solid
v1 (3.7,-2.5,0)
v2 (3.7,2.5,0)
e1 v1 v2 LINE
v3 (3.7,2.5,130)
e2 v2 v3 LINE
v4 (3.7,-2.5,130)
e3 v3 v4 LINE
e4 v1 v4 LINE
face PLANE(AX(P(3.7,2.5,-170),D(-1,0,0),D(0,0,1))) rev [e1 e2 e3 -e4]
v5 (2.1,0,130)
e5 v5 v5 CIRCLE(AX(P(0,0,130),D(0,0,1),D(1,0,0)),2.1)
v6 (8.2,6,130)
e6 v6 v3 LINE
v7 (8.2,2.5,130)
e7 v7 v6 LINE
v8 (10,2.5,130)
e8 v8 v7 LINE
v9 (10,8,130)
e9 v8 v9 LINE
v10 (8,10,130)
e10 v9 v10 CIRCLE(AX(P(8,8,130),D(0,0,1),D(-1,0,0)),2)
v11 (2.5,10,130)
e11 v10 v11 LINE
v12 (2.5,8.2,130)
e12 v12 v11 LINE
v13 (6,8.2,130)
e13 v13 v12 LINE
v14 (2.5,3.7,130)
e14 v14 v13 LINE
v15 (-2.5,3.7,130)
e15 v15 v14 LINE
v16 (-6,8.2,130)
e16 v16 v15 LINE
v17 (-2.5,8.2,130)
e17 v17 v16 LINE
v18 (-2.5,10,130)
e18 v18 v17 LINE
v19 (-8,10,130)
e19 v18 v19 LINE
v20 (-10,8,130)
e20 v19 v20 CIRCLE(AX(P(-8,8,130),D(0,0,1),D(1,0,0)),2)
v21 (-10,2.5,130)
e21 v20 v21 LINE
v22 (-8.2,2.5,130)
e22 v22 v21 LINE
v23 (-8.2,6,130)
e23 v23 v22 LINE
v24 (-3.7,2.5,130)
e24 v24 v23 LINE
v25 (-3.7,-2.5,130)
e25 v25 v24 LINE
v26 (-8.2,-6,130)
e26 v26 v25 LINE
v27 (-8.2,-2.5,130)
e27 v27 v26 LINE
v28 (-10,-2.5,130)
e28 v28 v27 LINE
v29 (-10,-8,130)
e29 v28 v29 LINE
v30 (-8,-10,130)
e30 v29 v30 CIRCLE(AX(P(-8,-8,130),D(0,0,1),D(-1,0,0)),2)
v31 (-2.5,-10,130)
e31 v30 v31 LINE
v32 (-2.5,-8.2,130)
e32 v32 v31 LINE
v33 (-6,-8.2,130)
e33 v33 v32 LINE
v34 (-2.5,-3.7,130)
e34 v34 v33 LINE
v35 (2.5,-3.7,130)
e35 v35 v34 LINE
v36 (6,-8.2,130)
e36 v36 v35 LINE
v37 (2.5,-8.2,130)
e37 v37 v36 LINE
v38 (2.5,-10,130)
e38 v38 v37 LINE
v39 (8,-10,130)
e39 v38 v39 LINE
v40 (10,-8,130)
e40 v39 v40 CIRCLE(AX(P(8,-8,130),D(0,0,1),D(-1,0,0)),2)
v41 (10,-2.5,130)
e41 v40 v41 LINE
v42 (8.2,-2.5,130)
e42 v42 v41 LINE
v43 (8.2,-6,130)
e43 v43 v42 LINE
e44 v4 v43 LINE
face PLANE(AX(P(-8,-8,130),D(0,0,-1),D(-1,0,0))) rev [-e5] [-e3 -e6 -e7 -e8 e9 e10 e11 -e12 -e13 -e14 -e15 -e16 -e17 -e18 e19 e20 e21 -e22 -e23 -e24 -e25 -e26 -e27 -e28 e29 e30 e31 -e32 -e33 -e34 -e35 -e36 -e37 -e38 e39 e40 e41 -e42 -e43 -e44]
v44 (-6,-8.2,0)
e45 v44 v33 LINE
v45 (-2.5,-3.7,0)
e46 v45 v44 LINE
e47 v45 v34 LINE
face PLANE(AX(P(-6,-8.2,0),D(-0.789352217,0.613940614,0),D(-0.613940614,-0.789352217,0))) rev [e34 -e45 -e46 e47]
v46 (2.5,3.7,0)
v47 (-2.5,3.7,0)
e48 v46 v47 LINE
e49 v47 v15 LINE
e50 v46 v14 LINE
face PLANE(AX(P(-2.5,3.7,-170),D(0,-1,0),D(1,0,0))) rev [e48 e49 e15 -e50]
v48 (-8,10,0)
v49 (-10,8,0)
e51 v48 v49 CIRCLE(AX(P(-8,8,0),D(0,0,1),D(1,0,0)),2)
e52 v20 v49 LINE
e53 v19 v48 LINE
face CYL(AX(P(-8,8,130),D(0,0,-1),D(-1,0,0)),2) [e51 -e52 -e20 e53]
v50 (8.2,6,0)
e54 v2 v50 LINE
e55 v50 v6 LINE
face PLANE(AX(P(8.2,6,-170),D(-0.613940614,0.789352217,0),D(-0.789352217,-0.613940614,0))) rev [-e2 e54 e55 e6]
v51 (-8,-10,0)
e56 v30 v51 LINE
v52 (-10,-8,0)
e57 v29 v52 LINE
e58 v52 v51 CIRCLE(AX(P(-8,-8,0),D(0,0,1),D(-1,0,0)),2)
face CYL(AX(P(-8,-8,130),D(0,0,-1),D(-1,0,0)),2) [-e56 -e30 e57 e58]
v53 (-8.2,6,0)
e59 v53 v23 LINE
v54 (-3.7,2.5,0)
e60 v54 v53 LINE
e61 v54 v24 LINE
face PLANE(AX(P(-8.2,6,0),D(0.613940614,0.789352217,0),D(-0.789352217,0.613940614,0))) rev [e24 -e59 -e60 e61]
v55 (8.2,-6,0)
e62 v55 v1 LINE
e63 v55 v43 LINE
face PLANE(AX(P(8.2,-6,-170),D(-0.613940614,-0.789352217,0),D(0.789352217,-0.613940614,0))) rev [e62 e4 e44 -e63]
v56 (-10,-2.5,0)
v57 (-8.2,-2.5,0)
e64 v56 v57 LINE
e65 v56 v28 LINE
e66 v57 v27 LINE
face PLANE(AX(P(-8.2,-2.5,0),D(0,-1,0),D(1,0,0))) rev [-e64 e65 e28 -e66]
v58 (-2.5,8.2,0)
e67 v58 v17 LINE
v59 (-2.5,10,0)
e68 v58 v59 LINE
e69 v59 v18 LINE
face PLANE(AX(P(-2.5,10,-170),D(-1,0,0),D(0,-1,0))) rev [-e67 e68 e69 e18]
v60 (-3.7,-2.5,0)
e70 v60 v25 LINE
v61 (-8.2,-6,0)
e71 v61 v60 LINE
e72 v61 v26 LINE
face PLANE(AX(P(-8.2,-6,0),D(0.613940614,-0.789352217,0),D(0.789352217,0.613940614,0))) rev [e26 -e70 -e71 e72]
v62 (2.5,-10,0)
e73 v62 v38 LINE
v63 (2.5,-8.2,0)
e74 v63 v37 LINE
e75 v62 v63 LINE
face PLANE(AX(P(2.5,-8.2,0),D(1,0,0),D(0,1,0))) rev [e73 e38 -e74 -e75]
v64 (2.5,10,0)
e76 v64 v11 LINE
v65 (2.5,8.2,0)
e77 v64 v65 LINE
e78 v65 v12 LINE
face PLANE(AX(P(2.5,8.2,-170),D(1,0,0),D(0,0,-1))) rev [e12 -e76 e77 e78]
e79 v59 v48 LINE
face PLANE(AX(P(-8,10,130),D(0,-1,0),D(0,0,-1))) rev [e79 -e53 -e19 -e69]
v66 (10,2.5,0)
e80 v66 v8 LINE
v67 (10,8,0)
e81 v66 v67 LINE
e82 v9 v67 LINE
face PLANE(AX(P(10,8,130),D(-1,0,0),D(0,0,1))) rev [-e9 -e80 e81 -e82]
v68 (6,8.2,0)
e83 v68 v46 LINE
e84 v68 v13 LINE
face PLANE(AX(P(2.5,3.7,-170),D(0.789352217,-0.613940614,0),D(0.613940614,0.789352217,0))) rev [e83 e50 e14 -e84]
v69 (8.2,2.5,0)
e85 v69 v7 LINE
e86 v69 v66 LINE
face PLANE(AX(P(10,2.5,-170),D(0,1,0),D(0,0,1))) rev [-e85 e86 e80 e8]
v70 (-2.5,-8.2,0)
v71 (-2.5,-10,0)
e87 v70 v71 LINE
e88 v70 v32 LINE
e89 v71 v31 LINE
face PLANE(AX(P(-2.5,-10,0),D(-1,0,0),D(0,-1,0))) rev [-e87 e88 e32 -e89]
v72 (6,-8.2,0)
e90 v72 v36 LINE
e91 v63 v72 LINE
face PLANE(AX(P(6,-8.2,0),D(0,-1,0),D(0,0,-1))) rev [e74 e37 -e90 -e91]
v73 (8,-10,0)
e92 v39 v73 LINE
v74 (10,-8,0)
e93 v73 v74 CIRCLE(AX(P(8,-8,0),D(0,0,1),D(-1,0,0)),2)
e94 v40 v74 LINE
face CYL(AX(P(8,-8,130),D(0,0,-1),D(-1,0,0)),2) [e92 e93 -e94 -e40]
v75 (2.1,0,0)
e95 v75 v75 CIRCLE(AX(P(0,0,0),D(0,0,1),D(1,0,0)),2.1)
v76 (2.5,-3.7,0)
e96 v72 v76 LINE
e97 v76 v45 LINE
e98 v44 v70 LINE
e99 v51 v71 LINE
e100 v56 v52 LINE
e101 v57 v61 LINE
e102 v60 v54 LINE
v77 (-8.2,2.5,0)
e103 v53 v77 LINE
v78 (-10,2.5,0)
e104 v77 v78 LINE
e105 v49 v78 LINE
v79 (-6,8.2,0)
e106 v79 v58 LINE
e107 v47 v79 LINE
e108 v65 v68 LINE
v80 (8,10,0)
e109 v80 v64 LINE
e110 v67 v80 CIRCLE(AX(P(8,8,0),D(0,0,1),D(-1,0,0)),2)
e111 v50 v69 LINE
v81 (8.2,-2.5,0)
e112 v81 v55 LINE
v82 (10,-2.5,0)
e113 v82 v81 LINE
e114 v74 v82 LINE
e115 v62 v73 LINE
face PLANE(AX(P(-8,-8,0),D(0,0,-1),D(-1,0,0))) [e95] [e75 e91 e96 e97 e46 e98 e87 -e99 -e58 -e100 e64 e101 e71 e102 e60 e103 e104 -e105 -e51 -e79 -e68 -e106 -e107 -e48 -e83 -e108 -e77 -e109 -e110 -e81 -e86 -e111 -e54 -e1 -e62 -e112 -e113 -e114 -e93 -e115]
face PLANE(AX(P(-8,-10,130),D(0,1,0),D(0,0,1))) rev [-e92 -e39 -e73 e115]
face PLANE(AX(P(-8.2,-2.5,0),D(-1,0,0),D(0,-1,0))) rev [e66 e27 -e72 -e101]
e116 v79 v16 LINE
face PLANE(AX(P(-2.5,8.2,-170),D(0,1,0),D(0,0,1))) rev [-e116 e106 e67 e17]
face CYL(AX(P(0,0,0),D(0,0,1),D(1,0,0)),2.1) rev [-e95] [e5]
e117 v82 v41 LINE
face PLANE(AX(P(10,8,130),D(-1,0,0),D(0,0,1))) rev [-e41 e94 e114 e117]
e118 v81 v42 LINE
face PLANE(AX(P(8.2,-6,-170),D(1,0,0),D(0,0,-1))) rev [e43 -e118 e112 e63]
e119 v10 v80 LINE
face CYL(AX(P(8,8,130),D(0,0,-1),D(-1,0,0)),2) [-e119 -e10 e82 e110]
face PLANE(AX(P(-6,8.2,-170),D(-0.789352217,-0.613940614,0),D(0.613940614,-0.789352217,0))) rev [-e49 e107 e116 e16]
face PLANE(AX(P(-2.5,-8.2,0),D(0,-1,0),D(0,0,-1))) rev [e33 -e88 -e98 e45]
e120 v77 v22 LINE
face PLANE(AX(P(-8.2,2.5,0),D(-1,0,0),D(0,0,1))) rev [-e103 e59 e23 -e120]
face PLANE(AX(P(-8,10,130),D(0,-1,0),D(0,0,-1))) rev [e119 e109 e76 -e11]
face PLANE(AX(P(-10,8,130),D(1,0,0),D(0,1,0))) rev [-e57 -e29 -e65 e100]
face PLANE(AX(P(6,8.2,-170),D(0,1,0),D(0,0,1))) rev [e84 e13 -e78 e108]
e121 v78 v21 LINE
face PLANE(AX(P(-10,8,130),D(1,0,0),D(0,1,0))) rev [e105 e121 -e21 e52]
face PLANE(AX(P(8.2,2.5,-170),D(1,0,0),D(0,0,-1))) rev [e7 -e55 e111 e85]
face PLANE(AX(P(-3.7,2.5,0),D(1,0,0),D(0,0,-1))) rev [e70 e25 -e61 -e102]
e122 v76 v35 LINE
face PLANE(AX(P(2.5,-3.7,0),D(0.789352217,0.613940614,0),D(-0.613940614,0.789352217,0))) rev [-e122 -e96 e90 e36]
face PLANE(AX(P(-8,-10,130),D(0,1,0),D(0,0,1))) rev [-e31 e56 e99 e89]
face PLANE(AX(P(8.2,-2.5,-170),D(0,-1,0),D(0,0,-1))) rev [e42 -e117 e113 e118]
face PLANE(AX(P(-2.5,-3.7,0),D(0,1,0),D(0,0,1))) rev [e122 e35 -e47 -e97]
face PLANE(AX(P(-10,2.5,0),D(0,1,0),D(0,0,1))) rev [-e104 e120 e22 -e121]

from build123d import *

# Parameters (mm, degrees)
EXTRUSION1_DEPTH        = 130
PER_AGE1_OUTLINE_R      = 2.1
PER_AGE1_DEPTH          = 130
ENL_V_MAT_EXTRU_1_DEPTH = 300
ENL_V_MAT_EXTRU_3_DEPTH = 300
ENL_V_MAT_EXTRU_4_DEPTH = 131.766968306
ENL_V_MAT_EXTRU_7_DEPTH = 131.766968306


# Read off the part's stored shape, not the designer's step: Perçage1
with BuildPart() as part:
    # Esquisse1 → Extrusion1 (new body)
    with BuildSketch(Plane.XY):
        with BuildLine():
            Line((-10, 8), (-10, -8))
            ThreePointArc((-10, -8), (-9.414213562, -9.414213562), (-8, -10))
            Line((-8, -10), (8, -10))
            ThreePointArc((8, -10), (9.414213562, -9.414213562), (10, -8))
            Line((10, -8), (10, 8))
            ThreePointArc((10, 8), (9.414213562, 9.414213562), (8, 10))
            Line((8, 10), (-8, 10))
            ThreePointArc((-8, 10), (-9.414213562, 9.414213562), (-10, 8))
        make_face()
    extrude(amount=EXTRUSION1_DEPTH)

    # Perçage1 outline → Perçage1 (cut)
    with BuildSketch(Plane.XY):
        Circle(PER_AGE1_OUTLINE_R)
    extrude(amount=PER_AGE1_DEPTH, mode=Mode.SUBTRACT)

    # Esquisse3 → Enlèv. mat.-Extru.1 (cut)
    with BuildSketch(Plane.XY.offset(130)):
        Polygon((10, 2.5), (8.2, 2.5), (8.2, 6), (3.7, 2.5), (3.7, -2.5), (8.2, -6), (8.2, -2.5), (10, -2.5), align=None)
    extrude(amount=-ENL_V_MAT_EXTRU_1_DEPTH, mode=Mode.SUBTRACT)

    # Esquisse5 → Enlèv. mat.-Extru.3 (cut)
    with BuildSketch(Plane.XY.offset(130)):
        Polygon((-2.5, 10), (-2.5, 8.2), (-6, 8.2), (-2.5, 3.7), (2.5, 3.7), (6, 8.2), (2.5, 8.2), (2.5, 10), align=None)
    extrude(amount=-ENL_V_MAT_EXTRU_3_DEPTH, mode=Mode.SUBTRACT)

    # Esquisse6 → Enlèv. mat.-Extru.4 (cut, through all)
    with BuildSketch(Plane.XY.offset(130)):
        Polygon((-2.5, -10), (-2.5, -8.2), (-6, -8.2), (-2.5, -3.7), (2.5, -3.7), (6, -8.2), (2.5, -8.2), (2.5, -10), align=None)
    extrude(amount=-ENL_V_MAT_EXTRU_4_DEPTH, mode=Mode.SUBTRACT)

    # Esquisse4 → Enlèv. mat.-Extru.7 (cut, through all)
    with BuildSketch(Plane.XY.offset(130)):
        Polygon((-10, 2.5), (-8.2, 2.5), (-8.2, 6), (-3.7, 2.5), (-3.7, -2.5), (-8.2, -6), (-8.2, -2.5), (-10, -2.5), align=None)
    extrude(amount=-ENL_V_MAT_EXTRU_7_DEPTH, mode=Mode.SUBTRACT)


solid = part.part
